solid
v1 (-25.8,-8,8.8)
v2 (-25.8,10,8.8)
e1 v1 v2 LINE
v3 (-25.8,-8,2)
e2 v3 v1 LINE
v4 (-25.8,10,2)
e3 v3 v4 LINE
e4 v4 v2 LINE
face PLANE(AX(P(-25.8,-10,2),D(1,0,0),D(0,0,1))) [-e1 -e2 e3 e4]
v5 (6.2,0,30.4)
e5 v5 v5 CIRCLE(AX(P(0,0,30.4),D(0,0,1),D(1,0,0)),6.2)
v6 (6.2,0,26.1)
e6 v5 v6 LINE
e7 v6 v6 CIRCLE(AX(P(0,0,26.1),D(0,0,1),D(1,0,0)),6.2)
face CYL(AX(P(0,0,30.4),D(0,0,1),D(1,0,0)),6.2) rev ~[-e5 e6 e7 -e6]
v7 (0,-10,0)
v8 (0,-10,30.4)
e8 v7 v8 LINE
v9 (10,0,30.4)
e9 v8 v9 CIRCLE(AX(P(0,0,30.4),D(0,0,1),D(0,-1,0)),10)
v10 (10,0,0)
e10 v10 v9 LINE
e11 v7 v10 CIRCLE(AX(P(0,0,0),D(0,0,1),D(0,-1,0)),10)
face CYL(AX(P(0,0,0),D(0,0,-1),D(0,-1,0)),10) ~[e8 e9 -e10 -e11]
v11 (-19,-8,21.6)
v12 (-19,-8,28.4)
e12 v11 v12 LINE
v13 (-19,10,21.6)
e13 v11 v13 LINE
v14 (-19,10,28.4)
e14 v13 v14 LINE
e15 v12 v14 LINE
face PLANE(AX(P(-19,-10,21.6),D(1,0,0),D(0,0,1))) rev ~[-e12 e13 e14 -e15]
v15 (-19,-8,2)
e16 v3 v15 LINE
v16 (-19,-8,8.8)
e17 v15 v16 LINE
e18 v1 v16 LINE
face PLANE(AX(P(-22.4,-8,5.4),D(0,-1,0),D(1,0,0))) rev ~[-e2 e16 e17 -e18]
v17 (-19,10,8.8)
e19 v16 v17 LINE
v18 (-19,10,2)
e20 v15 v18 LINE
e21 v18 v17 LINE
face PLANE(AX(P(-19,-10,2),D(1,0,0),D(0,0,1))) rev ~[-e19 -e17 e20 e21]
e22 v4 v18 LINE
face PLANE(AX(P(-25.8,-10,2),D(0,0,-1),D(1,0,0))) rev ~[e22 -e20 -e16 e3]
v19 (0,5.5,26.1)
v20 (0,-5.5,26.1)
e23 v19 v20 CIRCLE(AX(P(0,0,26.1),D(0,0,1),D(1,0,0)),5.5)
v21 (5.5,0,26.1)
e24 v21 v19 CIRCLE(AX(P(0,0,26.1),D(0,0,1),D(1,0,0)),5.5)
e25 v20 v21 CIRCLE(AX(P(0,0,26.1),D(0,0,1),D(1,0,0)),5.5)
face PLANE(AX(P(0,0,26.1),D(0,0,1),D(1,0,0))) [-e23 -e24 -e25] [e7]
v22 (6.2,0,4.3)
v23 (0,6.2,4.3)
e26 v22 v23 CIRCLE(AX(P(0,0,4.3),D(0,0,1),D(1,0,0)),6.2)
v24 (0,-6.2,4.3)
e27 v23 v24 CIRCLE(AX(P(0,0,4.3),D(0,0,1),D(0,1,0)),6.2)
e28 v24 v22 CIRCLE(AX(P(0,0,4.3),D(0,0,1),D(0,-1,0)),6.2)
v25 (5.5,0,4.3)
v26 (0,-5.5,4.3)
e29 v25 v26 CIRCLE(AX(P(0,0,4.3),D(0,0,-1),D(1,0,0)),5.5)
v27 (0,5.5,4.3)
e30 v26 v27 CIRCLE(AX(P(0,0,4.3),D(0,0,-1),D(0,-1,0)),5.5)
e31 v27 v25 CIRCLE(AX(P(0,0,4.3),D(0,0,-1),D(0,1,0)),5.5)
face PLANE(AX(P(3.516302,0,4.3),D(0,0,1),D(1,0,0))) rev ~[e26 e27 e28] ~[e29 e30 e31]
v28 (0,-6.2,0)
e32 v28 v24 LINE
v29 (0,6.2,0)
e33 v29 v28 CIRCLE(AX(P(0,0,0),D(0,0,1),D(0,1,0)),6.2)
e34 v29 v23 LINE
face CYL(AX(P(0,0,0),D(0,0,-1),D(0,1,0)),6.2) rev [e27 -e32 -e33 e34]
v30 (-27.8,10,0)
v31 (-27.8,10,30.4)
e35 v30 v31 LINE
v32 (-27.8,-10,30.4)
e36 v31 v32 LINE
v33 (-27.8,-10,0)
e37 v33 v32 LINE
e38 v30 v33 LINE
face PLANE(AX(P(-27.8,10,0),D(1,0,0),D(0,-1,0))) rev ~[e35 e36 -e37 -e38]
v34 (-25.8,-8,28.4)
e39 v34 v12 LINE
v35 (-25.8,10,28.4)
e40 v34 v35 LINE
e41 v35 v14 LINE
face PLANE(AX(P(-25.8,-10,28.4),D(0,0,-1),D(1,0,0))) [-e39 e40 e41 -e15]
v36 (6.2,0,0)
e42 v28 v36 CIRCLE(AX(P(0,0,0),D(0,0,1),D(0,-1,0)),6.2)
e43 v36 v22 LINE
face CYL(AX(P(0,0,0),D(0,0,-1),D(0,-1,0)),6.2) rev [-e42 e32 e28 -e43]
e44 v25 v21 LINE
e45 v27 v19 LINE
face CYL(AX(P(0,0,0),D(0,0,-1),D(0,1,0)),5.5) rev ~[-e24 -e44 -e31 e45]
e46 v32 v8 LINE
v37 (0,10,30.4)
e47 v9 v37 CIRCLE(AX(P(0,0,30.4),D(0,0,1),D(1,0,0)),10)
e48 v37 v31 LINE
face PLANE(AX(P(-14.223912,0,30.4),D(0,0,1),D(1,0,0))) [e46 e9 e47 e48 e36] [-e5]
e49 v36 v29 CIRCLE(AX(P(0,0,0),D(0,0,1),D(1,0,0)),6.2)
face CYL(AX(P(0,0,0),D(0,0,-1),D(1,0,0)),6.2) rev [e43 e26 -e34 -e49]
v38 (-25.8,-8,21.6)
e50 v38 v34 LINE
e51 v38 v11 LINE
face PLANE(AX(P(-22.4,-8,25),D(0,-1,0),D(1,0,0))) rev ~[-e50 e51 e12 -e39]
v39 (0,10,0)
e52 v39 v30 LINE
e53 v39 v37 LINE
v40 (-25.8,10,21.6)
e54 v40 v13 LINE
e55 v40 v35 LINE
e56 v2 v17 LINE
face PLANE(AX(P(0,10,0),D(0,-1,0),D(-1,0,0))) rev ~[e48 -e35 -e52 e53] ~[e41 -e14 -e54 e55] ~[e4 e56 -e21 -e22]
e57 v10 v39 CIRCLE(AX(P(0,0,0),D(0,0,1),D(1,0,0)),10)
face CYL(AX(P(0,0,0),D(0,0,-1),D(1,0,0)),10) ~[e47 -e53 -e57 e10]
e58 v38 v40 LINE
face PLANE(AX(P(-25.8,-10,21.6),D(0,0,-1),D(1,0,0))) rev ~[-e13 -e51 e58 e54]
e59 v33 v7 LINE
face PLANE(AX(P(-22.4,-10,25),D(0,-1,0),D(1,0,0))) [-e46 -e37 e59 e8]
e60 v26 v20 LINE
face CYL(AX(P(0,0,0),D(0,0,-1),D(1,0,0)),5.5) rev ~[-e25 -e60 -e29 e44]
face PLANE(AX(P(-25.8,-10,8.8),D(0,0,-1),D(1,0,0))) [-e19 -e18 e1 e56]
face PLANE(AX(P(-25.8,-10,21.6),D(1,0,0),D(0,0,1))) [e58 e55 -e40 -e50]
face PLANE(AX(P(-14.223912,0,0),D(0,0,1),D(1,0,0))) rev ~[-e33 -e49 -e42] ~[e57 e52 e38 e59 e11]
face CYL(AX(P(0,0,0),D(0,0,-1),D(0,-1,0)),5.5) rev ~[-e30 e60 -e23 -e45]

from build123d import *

# Parameters (mm, degrees)
F1_DEPTH = 30.4
F2_W     = 6.8
F2_H     = 6.8
F3_DEPTH = 50
F4_R     = 6.2
F4_R_2   = 5.5
F5_DEPTH = 4.3
F6_DEPTH = 4.3
F7_DEPTH = 2


# Not quite as in the source:
# - a feature names something its author has since deleted; it is built from what else it names


with BuildPart() as f1:
    # F0 (on Top) → F1 (new body)
    with BuildSketch(Plane.XY):
        with BuildLine():
            ThreePointArc((0, -10), (-10, 0), (0, 10))
            Line((0, 10), (-27.8, 10))
            Line((-27.8, 10), (-27.8, -10))
            Line((-27.8, -10), (0, -10))
        make_face()
        with BuildLine():
            ThreePointArc((0, -10), (7.0710678119, -7.0710678119), (10, 0))
            ThreePointArc((10, 0), (7.0710678119, 7.0710678119), (0, 10))
            Line((0, 10), (0, 6.2))
            ThreePointArc((0, 6.2), (4.3840620434, 4.3840620434), (6.2, 0))
            ThreePointArc((6.2, 0), (4.3840620434, -4.3840620434), (0, -6.2))
            Line((0, -6.2), (0, -10))
        make_face()
        with BuildLine():
            Line((0, 6.2), (0, 10))
            ThreePointArc((0, 10), (-10, 0), (0, -10))
            Line((0, -10), (0, -6.2))
            ThreePointArc((0, -6.2), (-6.2, 0), (0, 6.2))
        make_face()
        with BuildLine():
            Line((0, 5.5), (0, 6.2))
            ThreePointArc((0, 6.2), (-6.2, 0), (0, -6.2))
            Line((0, -6.2), (0, -5.5))
            ThreePointArc((0, -5.5), (-5.5, 0), (0, 5.5))
        make_face()
        with BuildLine():
            ThreePointArc((6.2, 0), (4.3840620434, 4.3840620434), (0, 6.2))
            Line((0, 6.2), (0, 5.5))
            ThreePointArc((0, 5.5), (3.8890872965, 3.8890872965), (5.5, 0))
            ThreePointArc((5.5, 0), (3.8890872965, -3.8890872965), (0, -5.5))
            Line((0, -5.5), (0, -6.2))
            ThreePointArc((0, -6.2), (4.3840620434, -4.3840620434), (6.2, 0))
        make_face()
    extrude(amount=F1_DEPTH)

    # F2 (on face) → F3 (cut)
    with BuildSketch(Plane.XZ.offset(10)):
        with Locations((-22.4, 25)):
            Rectangle(F2_W, F2_H)
        with Locations((-22.4, 5.4)):
            Rectangle(F2_W, F2_H)
    extrude(amount=-F3_DEPTH, mode=Mode.SUBTRACT)

    # F4 (on face) → F5 (cut)
    with BuildSketch(Plane.XY.offset(30.4)):
        Circle(F4_R)
        Circle(F4_R_2, mode=Mode.SUBTRACT)
    extrude(amount=-F5_DEPTH, mode=Mode.SUBTRACT)

    # F0 (on Top) → F6 (cut)
    with BuildSketch(Plane.XY):
        with BuildLine():
            ThreePointArc((6.2, 0), (4.3840620434, 4.3840620434), (0, 6.2))
            Line((0, 6.2), (0, 5.5))
            ThreePointArc((0, 5.5), (3.8890872965, 3.8890872965), (5.5, 0))
            ThreePointArc((5.5, 0), (3.8890872965, -3.8890872965), (0, -5.5))
            Line((0, -5.5), (0, -6.2))
            ThreePointArc((0, -6.2), (4.3840620434, -4.3840620434), (6.2, 0))
        make_face()
        with BuildLine():
            Line((0, 5.5), (0, 6.2))
            ThreePointArc((0, 6.2), (-6.2, 0), (0, -6.2))
            Line((0, -6.2), (0, -5.5))
            ThreePointArc((0, -5.5), (-5.5, 0), (0, 5.5))
        make_face()
    extrude(amount=F6_DEPTH, mode=Mode.SUBTRACT)

    # F2 (on face) → F7 (join)
    with BuildSketch(Plane.XZ.offset(10)):
        with Locations((-22.4, 25)):
            Rectangle(F2_W, F2_H)
        with Locations((-22.4, 5.4)):
            Rectangle(F2_W, F2_H)
    extrude(amount=-F7_DEPTH)


solid = f1.part
